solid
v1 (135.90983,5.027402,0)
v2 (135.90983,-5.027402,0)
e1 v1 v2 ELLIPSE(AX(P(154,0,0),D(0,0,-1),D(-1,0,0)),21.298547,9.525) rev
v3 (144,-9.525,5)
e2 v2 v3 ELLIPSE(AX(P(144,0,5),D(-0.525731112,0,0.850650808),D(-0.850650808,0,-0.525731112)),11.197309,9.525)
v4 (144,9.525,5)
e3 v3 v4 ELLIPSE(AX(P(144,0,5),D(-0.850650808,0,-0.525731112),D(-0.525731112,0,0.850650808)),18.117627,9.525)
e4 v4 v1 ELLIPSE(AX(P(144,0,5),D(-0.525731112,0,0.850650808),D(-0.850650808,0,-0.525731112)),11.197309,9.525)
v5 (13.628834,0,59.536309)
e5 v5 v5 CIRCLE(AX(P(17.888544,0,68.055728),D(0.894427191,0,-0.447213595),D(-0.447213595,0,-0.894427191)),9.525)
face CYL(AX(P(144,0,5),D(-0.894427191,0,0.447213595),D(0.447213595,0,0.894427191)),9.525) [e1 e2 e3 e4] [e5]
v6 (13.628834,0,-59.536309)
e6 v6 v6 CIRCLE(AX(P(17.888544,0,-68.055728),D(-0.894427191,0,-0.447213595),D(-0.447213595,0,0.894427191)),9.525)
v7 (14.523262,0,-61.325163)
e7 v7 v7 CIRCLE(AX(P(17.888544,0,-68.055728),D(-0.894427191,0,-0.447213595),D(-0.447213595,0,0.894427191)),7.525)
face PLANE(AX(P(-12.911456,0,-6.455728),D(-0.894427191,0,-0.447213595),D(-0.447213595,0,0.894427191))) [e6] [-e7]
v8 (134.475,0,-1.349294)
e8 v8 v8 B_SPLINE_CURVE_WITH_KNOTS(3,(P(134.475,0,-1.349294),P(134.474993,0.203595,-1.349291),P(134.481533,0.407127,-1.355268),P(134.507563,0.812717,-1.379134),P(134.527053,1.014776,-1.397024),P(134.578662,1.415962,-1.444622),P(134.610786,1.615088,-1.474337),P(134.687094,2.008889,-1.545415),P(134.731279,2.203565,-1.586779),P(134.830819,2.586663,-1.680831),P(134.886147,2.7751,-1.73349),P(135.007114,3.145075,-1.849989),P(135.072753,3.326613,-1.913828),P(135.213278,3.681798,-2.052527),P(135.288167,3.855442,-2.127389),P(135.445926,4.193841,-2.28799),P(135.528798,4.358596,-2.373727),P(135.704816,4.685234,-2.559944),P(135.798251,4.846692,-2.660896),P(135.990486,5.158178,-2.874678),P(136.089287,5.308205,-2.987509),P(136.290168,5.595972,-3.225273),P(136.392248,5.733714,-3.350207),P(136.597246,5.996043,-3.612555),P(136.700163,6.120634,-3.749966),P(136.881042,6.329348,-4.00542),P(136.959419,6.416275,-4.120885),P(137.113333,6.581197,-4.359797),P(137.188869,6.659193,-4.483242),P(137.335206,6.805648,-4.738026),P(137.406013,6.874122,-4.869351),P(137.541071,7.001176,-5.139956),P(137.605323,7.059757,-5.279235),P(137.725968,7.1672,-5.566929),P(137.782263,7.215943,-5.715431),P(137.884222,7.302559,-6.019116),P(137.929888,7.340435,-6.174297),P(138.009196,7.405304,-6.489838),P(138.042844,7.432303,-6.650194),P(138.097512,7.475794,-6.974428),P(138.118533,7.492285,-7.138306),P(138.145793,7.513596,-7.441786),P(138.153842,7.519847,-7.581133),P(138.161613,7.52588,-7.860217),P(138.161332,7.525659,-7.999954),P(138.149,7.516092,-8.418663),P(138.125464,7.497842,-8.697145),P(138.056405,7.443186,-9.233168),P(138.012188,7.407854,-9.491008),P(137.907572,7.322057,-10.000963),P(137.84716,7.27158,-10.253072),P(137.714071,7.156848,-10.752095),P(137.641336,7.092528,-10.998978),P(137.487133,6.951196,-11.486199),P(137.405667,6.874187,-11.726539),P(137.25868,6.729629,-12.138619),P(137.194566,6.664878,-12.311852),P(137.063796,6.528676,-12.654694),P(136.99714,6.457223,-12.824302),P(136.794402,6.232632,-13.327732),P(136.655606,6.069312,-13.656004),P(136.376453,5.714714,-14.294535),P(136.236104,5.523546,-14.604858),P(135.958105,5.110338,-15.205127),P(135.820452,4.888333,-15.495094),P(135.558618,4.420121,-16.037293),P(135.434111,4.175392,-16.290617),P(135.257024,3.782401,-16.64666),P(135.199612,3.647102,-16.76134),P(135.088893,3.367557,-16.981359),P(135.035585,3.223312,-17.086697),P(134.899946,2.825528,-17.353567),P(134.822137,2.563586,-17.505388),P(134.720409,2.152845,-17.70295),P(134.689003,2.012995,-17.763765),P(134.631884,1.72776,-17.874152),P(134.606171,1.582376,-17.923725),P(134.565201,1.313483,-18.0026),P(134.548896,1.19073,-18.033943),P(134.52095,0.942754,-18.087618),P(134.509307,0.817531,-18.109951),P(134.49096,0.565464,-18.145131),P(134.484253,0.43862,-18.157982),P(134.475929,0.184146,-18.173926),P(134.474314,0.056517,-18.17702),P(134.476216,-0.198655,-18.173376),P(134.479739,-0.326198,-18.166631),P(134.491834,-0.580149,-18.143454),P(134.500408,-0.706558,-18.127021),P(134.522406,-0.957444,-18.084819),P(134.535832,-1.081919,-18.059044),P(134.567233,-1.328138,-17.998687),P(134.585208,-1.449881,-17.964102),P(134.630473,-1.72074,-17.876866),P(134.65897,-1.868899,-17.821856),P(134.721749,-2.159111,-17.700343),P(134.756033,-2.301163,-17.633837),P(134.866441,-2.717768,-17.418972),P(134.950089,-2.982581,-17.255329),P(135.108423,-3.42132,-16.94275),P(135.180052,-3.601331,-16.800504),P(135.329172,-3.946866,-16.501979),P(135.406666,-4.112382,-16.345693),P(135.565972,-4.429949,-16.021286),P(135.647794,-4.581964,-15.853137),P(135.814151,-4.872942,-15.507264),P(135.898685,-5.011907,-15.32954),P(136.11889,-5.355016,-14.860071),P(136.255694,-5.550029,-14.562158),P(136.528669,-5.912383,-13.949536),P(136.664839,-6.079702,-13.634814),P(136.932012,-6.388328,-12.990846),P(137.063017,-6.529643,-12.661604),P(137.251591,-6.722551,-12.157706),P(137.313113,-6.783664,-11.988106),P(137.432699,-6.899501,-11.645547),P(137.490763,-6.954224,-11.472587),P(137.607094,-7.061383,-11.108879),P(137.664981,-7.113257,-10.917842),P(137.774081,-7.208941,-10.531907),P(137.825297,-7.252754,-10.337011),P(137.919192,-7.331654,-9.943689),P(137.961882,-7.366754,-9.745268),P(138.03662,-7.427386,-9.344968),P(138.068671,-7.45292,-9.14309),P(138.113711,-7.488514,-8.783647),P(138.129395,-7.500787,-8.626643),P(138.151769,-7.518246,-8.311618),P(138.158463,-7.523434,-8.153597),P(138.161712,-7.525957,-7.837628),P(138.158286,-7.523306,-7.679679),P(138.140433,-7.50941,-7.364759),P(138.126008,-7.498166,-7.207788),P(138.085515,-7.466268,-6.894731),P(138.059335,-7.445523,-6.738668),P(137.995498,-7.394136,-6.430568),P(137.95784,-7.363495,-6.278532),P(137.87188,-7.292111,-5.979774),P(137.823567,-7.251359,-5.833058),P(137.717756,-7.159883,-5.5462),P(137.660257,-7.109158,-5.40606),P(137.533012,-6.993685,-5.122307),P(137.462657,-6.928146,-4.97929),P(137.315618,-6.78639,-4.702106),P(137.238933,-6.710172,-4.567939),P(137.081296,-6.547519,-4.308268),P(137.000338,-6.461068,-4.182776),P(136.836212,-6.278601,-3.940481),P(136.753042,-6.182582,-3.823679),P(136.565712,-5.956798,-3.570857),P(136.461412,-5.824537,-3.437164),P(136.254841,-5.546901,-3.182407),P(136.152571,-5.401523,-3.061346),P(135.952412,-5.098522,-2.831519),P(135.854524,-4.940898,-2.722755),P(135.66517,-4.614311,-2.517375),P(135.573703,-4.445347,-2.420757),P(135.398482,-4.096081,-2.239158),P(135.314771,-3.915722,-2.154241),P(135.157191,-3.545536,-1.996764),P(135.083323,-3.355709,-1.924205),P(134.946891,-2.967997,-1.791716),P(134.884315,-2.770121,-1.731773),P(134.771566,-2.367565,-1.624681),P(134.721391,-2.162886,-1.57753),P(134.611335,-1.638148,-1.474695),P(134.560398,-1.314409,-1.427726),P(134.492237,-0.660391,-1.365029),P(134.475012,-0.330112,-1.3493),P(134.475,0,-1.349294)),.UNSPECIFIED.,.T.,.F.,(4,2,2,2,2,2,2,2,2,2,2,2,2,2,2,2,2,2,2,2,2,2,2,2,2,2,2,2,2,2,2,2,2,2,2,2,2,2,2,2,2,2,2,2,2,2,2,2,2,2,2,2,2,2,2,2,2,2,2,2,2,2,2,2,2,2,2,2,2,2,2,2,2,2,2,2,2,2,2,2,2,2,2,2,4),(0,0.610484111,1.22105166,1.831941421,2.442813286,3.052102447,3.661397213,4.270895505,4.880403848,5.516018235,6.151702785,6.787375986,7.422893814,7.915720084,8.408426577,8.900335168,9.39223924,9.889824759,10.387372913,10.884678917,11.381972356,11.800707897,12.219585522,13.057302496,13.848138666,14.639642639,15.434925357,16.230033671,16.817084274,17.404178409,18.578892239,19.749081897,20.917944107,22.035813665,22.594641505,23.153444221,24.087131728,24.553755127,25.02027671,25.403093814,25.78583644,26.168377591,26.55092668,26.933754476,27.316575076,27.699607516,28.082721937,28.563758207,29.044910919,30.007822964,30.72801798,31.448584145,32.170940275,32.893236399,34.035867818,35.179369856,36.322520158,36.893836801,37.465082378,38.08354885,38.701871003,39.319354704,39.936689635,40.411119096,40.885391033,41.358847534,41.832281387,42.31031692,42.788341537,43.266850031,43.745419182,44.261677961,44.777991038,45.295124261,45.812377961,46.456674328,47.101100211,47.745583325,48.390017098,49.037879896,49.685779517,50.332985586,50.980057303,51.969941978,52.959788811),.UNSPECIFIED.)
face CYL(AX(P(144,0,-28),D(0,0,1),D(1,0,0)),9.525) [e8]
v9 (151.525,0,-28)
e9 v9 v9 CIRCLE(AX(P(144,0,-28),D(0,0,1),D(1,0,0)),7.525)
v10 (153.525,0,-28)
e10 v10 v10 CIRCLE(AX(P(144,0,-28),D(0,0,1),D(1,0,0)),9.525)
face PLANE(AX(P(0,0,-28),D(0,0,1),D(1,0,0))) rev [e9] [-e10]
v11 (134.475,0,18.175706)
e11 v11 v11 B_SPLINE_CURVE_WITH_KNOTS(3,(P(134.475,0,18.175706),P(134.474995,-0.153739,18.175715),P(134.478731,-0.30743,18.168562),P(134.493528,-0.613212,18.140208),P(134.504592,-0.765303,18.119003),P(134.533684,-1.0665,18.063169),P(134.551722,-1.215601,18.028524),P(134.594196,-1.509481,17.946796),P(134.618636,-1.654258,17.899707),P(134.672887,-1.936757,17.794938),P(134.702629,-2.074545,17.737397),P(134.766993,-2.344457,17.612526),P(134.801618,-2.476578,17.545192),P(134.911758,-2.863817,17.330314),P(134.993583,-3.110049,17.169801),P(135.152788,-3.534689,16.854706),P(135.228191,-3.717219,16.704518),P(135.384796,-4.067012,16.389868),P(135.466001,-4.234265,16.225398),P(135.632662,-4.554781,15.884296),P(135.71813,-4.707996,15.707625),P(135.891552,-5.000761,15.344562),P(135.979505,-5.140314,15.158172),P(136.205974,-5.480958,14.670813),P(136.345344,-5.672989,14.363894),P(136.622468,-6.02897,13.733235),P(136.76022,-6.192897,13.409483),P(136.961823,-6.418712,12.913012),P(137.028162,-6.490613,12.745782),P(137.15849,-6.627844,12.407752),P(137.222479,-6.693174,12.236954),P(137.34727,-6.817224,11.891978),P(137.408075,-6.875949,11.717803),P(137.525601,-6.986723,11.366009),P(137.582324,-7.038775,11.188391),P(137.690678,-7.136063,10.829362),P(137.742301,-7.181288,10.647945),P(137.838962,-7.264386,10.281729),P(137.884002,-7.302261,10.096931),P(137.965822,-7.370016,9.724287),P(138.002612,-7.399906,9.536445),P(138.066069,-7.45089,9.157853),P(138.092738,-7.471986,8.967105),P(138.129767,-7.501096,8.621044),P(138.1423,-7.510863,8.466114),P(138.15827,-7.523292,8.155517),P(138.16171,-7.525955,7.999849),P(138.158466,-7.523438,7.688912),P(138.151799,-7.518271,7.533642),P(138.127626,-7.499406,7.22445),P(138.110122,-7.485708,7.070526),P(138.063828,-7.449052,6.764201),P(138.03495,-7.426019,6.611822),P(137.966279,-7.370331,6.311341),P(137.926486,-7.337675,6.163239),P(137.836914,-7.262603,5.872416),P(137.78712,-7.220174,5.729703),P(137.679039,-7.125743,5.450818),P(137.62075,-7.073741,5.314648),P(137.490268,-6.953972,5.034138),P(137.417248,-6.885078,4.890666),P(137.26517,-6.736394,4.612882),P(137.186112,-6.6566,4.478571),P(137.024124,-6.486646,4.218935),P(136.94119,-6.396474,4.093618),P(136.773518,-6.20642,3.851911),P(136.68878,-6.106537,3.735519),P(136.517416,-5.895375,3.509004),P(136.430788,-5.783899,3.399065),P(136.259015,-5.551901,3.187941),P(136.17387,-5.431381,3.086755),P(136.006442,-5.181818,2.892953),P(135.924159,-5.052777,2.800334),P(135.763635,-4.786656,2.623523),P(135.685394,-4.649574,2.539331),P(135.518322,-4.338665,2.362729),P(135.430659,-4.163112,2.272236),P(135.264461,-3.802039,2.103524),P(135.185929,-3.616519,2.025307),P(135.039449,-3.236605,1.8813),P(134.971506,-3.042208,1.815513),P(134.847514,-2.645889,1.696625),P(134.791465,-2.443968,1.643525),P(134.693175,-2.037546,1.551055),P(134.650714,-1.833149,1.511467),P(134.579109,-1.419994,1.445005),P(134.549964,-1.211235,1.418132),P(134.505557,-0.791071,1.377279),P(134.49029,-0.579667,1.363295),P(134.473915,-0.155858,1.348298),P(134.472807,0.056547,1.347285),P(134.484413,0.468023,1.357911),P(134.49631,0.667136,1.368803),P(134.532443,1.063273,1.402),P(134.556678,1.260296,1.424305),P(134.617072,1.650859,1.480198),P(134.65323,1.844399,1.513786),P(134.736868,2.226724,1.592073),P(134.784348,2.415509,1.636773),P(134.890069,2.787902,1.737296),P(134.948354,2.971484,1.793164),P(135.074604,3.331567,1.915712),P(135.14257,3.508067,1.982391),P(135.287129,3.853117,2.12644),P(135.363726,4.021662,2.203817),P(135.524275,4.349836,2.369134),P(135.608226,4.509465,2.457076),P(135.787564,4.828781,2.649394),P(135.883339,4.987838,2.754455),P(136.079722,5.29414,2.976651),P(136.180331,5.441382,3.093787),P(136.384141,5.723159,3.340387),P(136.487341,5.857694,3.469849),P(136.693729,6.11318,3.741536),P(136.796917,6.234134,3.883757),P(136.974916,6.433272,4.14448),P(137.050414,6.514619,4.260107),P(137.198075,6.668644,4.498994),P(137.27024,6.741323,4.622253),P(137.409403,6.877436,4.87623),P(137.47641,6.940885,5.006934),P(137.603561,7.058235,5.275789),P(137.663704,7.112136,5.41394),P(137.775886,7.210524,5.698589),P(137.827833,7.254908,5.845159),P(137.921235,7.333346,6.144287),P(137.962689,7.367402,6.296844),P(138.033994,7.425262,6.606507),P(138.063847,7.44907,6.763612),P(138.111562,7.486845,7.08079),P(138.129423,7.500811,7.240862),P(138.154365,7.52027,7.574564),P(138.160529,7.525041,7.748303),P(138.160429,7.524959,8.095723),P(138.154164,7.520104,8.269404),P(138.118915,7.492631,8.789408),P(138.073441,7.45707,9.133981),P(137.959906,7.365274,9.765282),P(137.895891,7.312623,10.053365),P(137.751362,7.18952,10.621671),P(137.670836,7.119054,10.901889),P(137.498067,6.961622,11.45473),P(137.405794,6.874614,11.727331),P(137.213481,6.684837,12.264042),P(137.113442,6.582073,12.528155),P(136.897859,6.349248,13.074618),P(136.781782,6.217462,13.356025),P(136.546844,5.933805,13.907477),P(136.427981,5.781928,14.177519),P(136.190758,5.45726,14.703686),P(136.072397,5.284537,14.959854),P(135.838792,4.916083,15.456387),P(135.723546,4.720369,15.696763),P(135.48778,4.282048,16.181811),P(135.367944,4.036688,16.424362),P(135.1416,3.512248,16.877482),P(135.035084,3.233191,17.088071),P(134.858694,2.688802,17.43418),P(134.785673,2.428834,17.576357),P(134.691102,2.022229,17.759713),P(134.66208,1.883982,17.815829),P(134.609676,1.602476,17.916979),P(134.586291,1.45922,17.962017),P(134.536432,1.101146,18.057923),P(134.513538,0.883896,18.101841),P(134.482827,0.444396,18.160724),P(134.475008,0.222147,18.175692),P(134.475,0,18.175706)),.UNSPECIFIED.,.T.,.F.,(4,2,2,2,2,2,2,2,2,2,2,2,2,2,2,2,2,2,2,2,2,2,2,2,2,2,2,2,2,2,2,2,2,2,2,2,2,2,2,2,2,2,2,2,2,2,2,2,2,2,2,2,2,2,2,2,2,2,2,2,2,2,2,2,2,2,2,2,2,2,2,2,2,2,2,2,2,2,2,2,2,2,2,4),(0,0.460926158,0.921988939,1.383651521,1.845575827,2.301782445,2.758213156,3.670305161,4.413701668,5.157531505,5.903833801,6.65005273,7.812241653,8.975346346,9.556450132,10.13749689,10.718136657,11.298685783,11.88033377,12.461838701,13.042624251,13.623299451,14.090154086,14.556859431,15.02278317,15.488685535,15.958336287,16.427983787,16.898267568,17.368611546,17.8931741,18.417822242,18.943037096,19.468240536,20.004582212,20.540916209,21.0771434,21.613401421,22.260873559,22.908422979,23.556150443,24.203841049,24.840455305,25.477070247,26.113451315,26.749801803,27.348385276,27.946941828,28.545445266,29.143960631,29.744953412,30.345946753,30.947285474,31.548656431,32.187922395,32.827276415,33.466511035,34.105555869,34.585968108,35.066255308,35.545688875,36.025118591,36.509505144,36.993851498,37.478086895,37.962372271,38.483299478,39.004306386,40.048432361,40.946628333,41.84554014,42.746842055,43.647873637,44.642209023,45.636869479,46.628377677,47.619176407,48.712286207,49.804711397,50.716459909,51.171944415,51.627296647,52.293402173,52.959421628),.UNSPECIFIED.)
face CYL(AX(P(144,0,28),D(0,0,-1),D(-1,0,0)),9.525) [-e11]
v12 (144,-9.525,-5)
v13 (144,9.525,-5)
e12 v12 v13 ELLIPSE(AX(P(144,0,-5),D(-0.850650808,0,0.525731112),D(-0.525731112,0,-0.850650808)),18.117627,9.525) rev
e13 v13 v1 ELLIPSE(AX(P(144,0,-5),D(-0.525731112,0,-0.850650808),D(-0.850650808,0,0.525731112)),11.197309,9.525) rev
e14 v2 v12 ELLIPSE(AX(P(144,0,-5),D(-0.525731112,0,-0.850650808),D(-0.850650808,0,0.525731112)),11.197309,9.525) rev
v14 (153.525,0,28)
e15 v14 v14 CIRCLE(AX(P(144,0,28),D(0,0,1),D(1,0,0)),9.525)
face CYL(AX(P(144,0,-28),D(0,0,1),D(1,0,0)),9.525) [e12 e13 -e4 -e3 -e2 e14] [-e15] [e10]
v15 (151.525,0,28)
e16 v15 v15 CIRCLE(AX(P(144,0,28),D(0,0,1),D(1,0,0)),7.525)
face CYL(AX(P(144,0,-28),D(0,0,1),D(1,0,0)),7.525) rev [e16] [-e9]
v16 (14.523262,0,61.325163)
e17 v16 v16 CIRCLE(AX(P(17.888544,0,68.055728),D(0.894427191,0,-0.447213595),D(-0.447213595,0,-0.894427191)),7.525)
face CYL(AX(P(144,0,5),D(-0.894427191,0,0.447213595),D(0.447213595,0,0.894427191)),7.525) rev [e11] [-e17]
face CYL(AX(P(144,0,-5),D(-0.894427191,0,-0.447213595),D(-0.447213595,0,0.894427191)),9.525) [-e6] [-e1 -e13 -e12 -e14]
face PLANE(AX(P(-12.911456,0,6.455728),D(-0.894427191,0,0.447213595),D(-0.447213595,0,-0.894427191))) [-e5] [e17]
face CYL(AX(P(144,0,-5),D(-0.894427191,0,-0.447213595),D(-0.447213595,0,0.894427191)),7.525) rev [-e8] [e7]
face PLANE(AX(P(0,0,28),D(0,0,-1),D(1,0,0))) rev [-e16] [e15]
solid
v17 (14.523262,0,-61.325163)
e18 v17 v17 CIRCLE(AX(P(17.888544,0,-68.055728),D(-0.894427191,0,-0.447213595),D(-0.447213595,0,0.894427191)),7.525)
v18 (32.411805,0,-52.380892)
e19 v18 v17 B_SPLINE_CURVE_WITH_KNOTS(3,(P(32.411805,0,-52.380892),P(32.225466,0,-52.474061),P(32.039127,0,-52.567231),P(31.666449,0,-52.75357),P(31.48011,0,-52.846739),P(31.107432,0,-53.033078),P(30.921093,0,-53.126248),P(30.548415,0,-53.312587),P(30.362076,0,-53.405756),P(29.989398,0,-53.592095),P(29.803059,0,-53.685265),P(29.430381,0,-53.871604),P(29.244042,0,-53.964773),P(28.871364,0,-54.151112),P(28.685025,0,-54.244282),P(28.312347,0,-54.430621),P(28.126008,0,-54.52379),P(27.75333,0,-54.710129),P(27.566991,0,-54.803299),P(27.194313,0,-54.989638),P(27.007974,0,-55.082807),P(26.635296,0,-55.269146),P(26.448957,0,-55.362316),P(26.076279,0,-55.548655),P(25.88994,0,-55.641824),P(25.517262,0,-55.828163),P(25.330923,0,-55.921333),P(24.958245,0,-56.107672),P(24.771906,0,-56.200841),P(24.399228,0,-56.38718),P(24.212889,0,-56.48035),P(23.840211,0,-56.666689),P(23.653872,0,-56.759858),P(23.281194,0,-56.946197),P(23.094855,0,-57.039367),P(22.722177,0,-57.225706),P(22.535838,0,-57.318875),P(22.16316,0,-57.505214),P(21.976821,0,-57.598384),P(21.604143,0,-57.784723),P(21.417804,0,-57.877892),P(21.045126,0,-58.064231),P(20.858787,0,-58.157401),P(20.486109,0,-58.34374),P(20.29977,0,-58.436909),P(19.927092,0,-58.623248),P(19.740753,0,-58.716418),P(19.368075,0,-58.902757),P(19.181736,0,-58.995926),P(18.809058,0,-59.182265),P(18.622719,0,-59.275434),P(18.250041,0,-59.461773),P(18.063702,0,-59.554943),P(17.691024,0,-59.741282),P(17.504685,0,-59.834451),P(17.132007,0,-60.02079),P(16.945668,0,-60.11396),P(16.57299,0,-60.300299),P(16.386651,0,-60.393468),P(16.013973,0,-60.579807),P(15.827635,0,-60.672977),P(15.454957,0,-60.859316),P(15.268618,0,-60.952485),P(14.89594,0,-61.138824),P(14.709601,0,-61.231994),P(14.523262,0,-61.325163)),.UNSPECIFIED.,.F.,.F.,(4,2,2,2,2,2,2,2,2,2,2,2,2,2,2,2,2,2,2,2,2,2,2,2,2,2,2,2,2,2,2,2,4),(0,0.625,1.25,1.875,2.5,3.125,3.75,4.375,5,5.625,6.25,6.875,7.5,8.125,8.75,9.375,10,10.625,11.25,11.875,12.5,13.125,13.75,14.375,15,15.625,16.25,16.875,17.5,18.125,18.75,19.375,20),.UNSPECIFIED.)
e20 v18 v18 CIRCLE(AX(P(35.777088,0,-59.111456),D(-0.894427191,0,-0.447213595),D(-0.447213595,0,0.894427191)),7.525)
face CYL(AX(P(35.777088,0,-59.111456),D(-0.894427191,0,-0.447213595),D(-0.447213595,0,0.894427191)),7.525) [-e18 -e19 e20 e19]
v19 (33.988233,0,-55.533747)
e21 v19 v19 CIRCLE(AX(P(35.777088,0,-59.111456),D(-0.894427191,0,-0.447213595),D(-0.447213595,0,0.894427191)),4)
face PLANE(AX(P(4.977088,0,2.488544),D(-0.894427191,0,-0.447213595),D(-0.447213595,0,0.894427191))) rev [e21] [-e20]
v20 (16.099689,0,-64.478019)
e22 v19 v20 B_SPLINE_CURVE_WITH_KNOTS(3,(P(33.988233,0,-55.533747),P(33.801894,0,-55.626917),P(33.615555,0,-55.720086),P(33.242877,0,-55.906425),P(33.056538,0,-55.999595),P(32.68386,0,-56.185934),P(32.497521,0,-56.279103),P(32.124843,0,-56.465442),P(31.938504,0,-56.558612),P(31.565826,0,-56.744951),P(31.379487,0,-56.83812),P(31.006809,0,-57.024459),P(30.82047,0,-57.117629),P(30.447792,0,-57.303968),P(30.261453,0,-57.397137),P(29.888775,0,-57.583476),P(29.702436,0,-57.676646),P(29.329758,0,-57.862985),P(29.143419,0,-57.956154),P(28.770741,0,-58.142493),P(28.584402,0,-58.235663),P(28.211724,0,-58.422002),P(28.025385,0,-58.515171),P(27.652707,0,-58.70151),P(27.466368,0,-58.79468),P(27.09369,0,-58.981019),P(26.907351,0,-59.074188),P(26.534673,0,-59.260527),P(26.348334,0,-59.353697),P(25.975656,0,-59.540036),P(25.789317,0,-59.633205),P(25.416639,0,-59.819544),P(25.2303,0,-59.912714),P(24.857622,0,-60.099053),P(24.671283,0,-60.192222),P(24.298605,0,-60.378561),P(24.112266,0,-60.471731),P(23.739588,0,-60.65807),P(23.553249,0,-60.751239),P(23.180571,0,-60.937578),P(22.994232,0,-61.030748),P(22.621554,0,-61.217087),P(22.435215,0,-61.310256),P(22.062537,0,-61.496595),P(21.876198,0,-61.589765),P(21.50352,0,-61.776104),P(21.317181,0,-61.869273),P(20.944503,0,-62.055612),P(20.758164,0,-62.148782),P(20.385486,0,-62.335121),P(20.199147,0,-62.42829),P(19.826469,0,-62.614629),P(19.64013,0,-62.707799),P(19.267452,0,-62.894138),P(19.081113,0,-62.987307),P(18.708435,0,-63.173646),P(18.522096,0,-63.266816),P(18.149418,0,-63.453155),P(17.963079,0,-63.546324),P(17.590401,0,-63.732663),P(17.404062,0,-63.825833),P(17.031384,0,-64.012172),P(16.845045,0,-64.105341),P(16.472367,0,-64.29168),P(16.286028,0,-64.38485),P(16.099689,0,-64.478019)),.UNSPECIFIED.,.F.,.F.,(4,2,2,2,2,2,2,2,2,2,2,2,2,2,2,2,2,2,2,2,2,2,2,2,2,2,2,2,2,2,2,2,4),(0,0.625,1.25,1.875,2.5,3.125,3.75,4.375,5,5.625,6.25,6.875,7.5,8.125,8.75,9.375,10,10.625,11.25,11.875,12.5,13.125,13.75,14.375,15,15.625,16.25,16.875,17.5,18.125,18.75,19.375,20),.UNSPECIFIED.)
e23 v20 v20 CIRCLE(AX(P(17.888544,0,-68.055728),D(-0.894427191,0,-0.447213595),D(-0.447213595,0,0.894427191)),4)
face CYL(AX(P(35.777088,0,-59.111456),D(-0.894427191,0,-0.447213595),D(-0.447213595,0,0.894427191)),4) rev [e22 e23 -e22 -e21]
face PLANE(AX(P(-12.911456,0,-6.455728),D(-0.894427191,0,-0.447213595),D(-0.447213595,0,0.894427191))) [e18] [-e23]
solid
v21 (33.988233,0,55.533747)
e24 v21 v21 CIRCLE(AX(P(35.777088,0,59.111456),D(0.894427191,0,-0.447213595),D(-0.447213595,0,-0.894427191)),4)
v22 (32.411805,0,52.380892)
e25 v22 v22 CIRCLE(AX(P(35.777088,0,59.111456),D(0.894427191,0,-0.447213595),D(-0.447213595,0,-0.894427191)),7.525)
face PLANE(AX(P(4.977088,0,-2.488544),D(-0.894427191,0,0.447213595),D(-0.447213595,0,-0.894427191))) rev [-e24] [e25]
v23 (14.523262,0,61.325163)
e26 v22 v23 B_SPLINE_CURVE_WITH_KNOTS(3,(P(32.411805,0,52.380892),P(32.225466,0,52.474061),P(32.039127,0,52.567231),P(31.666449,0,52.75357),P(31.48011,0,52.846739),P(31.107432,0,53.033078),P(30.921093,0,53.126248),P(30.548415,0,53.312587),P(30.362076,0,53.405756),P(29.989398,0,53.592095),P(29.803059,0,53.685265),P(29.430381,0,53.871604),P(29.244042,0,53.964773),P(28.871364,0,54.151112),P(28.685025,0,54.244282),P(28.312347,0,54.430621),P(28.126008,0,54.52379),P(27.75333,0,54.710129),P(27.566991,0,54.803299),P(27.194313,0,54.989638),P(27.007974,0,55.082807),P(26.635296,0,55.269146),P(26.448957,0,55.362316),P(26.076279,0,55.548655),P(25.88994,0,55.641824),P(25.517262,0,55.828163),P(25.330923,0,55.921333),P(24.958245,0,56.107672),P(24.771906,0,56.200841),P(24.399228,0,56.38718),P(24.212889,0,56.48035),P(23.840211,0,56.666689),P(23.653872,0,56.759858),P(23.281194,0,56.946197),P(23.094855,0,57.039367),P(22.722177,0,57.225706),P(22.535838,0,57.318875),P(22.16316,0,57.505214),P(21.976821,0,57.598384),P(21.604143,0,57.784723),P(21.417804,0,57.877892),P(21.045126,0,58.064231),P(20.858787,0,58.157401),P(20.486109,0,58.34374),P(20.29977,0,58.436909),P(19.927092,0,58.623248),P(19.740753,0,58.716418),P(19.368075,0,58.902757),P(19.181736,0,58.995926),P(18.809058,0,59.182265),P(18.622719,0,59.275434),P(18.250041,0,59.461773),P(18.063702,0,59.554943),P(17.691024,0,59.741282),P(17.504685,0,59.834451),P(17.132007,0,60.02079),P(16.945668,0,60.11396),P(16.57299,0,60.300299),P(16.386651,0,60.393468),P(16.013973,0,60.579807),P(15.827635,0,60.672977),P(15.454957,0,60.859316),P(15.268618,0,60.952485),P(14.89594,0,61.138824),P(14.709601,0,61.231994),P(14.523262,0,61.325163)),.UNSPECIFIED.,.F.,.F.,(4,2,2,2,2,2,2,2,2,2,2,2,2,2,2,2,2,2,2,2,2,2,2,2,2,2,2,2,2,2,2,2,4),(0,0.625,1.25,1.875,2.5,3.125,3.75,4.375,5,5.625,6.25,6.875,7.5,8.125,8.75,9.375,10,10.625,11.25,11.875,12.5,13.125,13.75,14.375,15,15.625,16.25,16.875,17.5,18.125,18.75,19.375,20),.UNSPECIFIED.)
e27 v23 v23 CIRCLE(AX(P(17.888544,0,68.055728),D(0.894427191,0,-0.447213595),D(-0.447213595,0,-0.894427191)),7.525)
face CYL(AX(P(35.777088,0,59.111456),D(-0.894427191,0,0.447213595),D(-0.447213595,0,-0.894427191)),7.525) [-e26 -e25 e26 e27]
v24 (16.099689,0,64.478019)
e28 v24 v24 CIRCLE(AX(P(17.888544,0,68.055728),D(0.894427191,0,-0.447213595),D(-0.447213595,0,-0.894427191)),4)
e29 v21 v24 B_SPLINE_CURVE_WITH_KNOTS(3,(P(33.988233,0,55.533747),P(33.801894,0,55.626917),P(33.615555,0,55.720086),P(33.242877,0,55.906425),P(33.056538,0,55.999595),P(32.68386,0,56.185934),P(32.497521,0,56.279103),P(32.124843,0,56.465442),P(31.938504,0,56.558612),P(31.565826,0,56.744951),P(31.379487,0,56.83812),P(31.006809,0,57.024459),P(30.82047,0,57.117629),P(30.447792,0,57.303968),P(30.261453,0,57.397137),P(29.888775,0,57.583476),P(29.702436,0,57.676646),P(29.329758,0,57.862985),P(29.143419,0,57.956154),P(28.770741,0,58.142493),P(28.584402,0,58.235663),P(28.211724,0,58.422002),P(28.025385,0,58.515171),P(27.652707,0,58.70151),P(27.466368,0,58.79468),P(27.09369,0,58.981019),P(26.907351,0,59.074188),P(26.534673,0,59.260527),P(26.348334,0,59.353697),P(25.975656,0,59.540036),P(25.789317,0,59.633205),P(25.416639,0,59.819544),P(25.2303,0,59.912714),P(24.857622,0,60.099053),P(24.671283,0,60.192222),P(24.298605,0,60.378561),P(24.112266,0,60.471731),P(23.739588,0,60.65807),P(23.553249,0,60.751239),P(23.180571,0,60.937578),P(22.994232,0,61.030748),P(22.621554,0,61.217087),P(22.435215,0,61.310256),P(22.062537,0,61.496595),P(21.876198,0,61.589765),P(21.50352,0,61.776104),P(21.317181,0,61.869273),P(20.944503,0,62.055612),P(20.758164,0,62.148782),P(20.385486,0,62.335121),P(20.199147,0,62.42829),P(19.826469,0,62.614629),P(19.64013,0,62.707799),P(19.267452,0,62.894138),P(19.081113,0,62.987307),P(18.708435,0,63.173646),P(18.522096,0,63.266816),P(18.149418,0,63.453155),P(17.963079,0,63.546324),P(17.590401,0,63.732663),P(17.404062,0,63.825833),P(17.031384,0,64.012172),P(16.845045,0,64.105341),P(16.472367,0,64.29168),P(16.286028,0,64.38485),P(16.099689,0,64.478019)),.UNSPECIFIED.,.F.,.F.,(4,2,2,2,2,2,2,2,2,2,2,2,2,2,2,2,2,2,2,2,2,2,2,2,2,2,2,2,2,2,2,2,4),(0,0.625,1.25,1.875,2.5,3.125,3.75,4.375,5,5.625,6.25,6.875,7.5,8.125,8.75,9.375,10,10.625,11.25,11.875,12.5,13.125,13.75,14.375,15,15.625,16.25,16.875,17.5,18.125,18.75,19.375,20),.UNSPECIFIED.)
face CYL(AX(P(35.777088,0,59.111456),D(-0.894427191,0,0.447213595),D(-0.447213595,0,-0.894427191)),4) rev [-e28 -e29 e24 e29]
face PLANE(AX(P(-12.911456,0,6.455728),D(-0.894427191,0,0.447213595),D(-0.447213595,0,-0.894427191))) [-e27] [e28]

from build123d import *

# Parameters (mm, degrees)
SWEEP2_START            = -34.435446853
SWEEP2_OUTLINE_R        = 9.525
SWEEP2_OUTLINE_R_2      = 7.525
SWEEP2_DEPTH            = 160.996894379
CUT_EXTRUDE2_DEPTH      = 172.421230045
CUT_EXTRUDE2_DEPTH_BACK = 172.421230045
SKETCH5_3_R             = 9.525
SKETCH5_R               = 9.525
SKETCH5_R_2             = 7.525
BOSS_EXTRUDE6_DEPTH     = 28
SKETCH3_3_R             = 9.525
SKETCH3_3_R_2           = 7.525
CUT_EXTRUDE3_DEPTH      = 20
BOSS_EXTRUDE7_START     = -20
SKETCH3_4_R             = 7.525
SKETCH3_4_R_2           = 4
BOSS_EXTRUDE7_DEPTH     = 20
SKETCH7_R               = 7.525
CUT_EXTRUDE4_DEPTH      = 187.001646868


# Read off the part's stored shape, not the designer's step: Sweep2
with BuildPart() as part:
    # Sweep2 outline → Sweep2 (new body)
    with BuildSketch(Plane(origin=(0, 0, 0), x_dir=(0.4472135954999576, 0, -0.8944271909999161), z_dir=(0.894427190999916, 0, 0.447213595499958)).offset(SWEEP2_START)):
        with Locations((68.870893707, 0)):
            Circle(SWEEP2_OUTLINE_R)
        with Locations((68.870893707, 0)):
            Circle(SWEEP2_OUTLINE_R_2, mode=Mode.SUBTRACT)
    sweep2 = extrude(amount=SWEEP2_DEPTH)

    # Sketch5<3> → Cut-Extrude2 (cut, two sides: drawn at the far end of the back side and taken through both)
    with BuildSketch(Plane.XY.offset(-CUT_EXTRUDE2_DEPTH_BACK)):
        with Locations((144, 0)):
            Circle(SKETCH5_3_R)
    extrude(amount=CUT_EXTRUDE2_DEPTH + CUT_EXTRUDE2_DEPTH_BACK, mode=Mode.SUBTRACT)

    # Sketch5 → Boss-Extrude6 (add)
    with BuildSketch(Plane.XY):
        with Locations((144, 0)):
            Circle(SKETCH5_R)
        with Locations((144, 0)):
            Circle(SKETCH5_R_2, mode=Mode.SUBTRACT)
    boss_extrude6 = extrude(amount=-BOSS_EXTRUDE6_DEPTH)

    # Sketch3<3> → Cut-Extrude3 (cut)
    with BuildSketch(Plane(origin=(0, 0, -77), x_dir=(-0.447213595499958, 0, 0.894427190999916), z_dir=(-0.8944271909999159, 0, -0.4472135954999579))):
        Circle(SKETCH3_3_R)
        Circle(SKETCH3_3_R_2, mode=Mode.SUBTRACT)
    cut_extrude3 = extrude(amount=-CUT_EXTRUDE3_DEPTH, mode=Mode.SUBTRACT)

    # Mirror2: Sweep2, Boss-Extrude6, Cut-Extrude3 across plane
    add(sweep2.mirror(Plane.XY))
    add(boss_extrude6.mirror(Plane.XY))
    add(cut_extrude3.mirror(Plane.XY), mode=Mode.SUBTRACT)

    # Sketch7 → Cut-Extrude4 (cut, through all)
    with BuildSketch(Plane(origin=(0, 0, -28), x_dir=(-1, 0, 0), z_dir=(0, 0, -1))):
        with Locations(Location((-144, 0, 0), (0, 0, 180))):
            Circle(SKETCH7_R)
    extrude(amount=-CUT_EXTRUDE4_DEPTH, mode=Mode.SUBTRACT)


with BuildPart() as body_2:
    # Sketch3<4> → Boss-Extrude7 (new body)
    with BuildSketch(Plane(origin=(0, 0, -77), x_dir=(-0.447213595499958, 0, 0.894427190999916), z_dir=(-0.8944271909999159, 0, -0.4472135954999579)).offset(BOSS_EXTRUDE7_START)):
        Circle(SKETCH3_4_R)
        Circle(SKETCH3_4_R_2, mode=Mode.SUBTRACT)
    extrude(amount=-BOSS_EXTRUDE7_DEPTH)


with BuildPart() as body_3:
    # Mirror5: mirrored copy
    add(body_2.part.mirror(Plane.XY))


solid = Compound([part.part, body_2.part, body_3.part])
